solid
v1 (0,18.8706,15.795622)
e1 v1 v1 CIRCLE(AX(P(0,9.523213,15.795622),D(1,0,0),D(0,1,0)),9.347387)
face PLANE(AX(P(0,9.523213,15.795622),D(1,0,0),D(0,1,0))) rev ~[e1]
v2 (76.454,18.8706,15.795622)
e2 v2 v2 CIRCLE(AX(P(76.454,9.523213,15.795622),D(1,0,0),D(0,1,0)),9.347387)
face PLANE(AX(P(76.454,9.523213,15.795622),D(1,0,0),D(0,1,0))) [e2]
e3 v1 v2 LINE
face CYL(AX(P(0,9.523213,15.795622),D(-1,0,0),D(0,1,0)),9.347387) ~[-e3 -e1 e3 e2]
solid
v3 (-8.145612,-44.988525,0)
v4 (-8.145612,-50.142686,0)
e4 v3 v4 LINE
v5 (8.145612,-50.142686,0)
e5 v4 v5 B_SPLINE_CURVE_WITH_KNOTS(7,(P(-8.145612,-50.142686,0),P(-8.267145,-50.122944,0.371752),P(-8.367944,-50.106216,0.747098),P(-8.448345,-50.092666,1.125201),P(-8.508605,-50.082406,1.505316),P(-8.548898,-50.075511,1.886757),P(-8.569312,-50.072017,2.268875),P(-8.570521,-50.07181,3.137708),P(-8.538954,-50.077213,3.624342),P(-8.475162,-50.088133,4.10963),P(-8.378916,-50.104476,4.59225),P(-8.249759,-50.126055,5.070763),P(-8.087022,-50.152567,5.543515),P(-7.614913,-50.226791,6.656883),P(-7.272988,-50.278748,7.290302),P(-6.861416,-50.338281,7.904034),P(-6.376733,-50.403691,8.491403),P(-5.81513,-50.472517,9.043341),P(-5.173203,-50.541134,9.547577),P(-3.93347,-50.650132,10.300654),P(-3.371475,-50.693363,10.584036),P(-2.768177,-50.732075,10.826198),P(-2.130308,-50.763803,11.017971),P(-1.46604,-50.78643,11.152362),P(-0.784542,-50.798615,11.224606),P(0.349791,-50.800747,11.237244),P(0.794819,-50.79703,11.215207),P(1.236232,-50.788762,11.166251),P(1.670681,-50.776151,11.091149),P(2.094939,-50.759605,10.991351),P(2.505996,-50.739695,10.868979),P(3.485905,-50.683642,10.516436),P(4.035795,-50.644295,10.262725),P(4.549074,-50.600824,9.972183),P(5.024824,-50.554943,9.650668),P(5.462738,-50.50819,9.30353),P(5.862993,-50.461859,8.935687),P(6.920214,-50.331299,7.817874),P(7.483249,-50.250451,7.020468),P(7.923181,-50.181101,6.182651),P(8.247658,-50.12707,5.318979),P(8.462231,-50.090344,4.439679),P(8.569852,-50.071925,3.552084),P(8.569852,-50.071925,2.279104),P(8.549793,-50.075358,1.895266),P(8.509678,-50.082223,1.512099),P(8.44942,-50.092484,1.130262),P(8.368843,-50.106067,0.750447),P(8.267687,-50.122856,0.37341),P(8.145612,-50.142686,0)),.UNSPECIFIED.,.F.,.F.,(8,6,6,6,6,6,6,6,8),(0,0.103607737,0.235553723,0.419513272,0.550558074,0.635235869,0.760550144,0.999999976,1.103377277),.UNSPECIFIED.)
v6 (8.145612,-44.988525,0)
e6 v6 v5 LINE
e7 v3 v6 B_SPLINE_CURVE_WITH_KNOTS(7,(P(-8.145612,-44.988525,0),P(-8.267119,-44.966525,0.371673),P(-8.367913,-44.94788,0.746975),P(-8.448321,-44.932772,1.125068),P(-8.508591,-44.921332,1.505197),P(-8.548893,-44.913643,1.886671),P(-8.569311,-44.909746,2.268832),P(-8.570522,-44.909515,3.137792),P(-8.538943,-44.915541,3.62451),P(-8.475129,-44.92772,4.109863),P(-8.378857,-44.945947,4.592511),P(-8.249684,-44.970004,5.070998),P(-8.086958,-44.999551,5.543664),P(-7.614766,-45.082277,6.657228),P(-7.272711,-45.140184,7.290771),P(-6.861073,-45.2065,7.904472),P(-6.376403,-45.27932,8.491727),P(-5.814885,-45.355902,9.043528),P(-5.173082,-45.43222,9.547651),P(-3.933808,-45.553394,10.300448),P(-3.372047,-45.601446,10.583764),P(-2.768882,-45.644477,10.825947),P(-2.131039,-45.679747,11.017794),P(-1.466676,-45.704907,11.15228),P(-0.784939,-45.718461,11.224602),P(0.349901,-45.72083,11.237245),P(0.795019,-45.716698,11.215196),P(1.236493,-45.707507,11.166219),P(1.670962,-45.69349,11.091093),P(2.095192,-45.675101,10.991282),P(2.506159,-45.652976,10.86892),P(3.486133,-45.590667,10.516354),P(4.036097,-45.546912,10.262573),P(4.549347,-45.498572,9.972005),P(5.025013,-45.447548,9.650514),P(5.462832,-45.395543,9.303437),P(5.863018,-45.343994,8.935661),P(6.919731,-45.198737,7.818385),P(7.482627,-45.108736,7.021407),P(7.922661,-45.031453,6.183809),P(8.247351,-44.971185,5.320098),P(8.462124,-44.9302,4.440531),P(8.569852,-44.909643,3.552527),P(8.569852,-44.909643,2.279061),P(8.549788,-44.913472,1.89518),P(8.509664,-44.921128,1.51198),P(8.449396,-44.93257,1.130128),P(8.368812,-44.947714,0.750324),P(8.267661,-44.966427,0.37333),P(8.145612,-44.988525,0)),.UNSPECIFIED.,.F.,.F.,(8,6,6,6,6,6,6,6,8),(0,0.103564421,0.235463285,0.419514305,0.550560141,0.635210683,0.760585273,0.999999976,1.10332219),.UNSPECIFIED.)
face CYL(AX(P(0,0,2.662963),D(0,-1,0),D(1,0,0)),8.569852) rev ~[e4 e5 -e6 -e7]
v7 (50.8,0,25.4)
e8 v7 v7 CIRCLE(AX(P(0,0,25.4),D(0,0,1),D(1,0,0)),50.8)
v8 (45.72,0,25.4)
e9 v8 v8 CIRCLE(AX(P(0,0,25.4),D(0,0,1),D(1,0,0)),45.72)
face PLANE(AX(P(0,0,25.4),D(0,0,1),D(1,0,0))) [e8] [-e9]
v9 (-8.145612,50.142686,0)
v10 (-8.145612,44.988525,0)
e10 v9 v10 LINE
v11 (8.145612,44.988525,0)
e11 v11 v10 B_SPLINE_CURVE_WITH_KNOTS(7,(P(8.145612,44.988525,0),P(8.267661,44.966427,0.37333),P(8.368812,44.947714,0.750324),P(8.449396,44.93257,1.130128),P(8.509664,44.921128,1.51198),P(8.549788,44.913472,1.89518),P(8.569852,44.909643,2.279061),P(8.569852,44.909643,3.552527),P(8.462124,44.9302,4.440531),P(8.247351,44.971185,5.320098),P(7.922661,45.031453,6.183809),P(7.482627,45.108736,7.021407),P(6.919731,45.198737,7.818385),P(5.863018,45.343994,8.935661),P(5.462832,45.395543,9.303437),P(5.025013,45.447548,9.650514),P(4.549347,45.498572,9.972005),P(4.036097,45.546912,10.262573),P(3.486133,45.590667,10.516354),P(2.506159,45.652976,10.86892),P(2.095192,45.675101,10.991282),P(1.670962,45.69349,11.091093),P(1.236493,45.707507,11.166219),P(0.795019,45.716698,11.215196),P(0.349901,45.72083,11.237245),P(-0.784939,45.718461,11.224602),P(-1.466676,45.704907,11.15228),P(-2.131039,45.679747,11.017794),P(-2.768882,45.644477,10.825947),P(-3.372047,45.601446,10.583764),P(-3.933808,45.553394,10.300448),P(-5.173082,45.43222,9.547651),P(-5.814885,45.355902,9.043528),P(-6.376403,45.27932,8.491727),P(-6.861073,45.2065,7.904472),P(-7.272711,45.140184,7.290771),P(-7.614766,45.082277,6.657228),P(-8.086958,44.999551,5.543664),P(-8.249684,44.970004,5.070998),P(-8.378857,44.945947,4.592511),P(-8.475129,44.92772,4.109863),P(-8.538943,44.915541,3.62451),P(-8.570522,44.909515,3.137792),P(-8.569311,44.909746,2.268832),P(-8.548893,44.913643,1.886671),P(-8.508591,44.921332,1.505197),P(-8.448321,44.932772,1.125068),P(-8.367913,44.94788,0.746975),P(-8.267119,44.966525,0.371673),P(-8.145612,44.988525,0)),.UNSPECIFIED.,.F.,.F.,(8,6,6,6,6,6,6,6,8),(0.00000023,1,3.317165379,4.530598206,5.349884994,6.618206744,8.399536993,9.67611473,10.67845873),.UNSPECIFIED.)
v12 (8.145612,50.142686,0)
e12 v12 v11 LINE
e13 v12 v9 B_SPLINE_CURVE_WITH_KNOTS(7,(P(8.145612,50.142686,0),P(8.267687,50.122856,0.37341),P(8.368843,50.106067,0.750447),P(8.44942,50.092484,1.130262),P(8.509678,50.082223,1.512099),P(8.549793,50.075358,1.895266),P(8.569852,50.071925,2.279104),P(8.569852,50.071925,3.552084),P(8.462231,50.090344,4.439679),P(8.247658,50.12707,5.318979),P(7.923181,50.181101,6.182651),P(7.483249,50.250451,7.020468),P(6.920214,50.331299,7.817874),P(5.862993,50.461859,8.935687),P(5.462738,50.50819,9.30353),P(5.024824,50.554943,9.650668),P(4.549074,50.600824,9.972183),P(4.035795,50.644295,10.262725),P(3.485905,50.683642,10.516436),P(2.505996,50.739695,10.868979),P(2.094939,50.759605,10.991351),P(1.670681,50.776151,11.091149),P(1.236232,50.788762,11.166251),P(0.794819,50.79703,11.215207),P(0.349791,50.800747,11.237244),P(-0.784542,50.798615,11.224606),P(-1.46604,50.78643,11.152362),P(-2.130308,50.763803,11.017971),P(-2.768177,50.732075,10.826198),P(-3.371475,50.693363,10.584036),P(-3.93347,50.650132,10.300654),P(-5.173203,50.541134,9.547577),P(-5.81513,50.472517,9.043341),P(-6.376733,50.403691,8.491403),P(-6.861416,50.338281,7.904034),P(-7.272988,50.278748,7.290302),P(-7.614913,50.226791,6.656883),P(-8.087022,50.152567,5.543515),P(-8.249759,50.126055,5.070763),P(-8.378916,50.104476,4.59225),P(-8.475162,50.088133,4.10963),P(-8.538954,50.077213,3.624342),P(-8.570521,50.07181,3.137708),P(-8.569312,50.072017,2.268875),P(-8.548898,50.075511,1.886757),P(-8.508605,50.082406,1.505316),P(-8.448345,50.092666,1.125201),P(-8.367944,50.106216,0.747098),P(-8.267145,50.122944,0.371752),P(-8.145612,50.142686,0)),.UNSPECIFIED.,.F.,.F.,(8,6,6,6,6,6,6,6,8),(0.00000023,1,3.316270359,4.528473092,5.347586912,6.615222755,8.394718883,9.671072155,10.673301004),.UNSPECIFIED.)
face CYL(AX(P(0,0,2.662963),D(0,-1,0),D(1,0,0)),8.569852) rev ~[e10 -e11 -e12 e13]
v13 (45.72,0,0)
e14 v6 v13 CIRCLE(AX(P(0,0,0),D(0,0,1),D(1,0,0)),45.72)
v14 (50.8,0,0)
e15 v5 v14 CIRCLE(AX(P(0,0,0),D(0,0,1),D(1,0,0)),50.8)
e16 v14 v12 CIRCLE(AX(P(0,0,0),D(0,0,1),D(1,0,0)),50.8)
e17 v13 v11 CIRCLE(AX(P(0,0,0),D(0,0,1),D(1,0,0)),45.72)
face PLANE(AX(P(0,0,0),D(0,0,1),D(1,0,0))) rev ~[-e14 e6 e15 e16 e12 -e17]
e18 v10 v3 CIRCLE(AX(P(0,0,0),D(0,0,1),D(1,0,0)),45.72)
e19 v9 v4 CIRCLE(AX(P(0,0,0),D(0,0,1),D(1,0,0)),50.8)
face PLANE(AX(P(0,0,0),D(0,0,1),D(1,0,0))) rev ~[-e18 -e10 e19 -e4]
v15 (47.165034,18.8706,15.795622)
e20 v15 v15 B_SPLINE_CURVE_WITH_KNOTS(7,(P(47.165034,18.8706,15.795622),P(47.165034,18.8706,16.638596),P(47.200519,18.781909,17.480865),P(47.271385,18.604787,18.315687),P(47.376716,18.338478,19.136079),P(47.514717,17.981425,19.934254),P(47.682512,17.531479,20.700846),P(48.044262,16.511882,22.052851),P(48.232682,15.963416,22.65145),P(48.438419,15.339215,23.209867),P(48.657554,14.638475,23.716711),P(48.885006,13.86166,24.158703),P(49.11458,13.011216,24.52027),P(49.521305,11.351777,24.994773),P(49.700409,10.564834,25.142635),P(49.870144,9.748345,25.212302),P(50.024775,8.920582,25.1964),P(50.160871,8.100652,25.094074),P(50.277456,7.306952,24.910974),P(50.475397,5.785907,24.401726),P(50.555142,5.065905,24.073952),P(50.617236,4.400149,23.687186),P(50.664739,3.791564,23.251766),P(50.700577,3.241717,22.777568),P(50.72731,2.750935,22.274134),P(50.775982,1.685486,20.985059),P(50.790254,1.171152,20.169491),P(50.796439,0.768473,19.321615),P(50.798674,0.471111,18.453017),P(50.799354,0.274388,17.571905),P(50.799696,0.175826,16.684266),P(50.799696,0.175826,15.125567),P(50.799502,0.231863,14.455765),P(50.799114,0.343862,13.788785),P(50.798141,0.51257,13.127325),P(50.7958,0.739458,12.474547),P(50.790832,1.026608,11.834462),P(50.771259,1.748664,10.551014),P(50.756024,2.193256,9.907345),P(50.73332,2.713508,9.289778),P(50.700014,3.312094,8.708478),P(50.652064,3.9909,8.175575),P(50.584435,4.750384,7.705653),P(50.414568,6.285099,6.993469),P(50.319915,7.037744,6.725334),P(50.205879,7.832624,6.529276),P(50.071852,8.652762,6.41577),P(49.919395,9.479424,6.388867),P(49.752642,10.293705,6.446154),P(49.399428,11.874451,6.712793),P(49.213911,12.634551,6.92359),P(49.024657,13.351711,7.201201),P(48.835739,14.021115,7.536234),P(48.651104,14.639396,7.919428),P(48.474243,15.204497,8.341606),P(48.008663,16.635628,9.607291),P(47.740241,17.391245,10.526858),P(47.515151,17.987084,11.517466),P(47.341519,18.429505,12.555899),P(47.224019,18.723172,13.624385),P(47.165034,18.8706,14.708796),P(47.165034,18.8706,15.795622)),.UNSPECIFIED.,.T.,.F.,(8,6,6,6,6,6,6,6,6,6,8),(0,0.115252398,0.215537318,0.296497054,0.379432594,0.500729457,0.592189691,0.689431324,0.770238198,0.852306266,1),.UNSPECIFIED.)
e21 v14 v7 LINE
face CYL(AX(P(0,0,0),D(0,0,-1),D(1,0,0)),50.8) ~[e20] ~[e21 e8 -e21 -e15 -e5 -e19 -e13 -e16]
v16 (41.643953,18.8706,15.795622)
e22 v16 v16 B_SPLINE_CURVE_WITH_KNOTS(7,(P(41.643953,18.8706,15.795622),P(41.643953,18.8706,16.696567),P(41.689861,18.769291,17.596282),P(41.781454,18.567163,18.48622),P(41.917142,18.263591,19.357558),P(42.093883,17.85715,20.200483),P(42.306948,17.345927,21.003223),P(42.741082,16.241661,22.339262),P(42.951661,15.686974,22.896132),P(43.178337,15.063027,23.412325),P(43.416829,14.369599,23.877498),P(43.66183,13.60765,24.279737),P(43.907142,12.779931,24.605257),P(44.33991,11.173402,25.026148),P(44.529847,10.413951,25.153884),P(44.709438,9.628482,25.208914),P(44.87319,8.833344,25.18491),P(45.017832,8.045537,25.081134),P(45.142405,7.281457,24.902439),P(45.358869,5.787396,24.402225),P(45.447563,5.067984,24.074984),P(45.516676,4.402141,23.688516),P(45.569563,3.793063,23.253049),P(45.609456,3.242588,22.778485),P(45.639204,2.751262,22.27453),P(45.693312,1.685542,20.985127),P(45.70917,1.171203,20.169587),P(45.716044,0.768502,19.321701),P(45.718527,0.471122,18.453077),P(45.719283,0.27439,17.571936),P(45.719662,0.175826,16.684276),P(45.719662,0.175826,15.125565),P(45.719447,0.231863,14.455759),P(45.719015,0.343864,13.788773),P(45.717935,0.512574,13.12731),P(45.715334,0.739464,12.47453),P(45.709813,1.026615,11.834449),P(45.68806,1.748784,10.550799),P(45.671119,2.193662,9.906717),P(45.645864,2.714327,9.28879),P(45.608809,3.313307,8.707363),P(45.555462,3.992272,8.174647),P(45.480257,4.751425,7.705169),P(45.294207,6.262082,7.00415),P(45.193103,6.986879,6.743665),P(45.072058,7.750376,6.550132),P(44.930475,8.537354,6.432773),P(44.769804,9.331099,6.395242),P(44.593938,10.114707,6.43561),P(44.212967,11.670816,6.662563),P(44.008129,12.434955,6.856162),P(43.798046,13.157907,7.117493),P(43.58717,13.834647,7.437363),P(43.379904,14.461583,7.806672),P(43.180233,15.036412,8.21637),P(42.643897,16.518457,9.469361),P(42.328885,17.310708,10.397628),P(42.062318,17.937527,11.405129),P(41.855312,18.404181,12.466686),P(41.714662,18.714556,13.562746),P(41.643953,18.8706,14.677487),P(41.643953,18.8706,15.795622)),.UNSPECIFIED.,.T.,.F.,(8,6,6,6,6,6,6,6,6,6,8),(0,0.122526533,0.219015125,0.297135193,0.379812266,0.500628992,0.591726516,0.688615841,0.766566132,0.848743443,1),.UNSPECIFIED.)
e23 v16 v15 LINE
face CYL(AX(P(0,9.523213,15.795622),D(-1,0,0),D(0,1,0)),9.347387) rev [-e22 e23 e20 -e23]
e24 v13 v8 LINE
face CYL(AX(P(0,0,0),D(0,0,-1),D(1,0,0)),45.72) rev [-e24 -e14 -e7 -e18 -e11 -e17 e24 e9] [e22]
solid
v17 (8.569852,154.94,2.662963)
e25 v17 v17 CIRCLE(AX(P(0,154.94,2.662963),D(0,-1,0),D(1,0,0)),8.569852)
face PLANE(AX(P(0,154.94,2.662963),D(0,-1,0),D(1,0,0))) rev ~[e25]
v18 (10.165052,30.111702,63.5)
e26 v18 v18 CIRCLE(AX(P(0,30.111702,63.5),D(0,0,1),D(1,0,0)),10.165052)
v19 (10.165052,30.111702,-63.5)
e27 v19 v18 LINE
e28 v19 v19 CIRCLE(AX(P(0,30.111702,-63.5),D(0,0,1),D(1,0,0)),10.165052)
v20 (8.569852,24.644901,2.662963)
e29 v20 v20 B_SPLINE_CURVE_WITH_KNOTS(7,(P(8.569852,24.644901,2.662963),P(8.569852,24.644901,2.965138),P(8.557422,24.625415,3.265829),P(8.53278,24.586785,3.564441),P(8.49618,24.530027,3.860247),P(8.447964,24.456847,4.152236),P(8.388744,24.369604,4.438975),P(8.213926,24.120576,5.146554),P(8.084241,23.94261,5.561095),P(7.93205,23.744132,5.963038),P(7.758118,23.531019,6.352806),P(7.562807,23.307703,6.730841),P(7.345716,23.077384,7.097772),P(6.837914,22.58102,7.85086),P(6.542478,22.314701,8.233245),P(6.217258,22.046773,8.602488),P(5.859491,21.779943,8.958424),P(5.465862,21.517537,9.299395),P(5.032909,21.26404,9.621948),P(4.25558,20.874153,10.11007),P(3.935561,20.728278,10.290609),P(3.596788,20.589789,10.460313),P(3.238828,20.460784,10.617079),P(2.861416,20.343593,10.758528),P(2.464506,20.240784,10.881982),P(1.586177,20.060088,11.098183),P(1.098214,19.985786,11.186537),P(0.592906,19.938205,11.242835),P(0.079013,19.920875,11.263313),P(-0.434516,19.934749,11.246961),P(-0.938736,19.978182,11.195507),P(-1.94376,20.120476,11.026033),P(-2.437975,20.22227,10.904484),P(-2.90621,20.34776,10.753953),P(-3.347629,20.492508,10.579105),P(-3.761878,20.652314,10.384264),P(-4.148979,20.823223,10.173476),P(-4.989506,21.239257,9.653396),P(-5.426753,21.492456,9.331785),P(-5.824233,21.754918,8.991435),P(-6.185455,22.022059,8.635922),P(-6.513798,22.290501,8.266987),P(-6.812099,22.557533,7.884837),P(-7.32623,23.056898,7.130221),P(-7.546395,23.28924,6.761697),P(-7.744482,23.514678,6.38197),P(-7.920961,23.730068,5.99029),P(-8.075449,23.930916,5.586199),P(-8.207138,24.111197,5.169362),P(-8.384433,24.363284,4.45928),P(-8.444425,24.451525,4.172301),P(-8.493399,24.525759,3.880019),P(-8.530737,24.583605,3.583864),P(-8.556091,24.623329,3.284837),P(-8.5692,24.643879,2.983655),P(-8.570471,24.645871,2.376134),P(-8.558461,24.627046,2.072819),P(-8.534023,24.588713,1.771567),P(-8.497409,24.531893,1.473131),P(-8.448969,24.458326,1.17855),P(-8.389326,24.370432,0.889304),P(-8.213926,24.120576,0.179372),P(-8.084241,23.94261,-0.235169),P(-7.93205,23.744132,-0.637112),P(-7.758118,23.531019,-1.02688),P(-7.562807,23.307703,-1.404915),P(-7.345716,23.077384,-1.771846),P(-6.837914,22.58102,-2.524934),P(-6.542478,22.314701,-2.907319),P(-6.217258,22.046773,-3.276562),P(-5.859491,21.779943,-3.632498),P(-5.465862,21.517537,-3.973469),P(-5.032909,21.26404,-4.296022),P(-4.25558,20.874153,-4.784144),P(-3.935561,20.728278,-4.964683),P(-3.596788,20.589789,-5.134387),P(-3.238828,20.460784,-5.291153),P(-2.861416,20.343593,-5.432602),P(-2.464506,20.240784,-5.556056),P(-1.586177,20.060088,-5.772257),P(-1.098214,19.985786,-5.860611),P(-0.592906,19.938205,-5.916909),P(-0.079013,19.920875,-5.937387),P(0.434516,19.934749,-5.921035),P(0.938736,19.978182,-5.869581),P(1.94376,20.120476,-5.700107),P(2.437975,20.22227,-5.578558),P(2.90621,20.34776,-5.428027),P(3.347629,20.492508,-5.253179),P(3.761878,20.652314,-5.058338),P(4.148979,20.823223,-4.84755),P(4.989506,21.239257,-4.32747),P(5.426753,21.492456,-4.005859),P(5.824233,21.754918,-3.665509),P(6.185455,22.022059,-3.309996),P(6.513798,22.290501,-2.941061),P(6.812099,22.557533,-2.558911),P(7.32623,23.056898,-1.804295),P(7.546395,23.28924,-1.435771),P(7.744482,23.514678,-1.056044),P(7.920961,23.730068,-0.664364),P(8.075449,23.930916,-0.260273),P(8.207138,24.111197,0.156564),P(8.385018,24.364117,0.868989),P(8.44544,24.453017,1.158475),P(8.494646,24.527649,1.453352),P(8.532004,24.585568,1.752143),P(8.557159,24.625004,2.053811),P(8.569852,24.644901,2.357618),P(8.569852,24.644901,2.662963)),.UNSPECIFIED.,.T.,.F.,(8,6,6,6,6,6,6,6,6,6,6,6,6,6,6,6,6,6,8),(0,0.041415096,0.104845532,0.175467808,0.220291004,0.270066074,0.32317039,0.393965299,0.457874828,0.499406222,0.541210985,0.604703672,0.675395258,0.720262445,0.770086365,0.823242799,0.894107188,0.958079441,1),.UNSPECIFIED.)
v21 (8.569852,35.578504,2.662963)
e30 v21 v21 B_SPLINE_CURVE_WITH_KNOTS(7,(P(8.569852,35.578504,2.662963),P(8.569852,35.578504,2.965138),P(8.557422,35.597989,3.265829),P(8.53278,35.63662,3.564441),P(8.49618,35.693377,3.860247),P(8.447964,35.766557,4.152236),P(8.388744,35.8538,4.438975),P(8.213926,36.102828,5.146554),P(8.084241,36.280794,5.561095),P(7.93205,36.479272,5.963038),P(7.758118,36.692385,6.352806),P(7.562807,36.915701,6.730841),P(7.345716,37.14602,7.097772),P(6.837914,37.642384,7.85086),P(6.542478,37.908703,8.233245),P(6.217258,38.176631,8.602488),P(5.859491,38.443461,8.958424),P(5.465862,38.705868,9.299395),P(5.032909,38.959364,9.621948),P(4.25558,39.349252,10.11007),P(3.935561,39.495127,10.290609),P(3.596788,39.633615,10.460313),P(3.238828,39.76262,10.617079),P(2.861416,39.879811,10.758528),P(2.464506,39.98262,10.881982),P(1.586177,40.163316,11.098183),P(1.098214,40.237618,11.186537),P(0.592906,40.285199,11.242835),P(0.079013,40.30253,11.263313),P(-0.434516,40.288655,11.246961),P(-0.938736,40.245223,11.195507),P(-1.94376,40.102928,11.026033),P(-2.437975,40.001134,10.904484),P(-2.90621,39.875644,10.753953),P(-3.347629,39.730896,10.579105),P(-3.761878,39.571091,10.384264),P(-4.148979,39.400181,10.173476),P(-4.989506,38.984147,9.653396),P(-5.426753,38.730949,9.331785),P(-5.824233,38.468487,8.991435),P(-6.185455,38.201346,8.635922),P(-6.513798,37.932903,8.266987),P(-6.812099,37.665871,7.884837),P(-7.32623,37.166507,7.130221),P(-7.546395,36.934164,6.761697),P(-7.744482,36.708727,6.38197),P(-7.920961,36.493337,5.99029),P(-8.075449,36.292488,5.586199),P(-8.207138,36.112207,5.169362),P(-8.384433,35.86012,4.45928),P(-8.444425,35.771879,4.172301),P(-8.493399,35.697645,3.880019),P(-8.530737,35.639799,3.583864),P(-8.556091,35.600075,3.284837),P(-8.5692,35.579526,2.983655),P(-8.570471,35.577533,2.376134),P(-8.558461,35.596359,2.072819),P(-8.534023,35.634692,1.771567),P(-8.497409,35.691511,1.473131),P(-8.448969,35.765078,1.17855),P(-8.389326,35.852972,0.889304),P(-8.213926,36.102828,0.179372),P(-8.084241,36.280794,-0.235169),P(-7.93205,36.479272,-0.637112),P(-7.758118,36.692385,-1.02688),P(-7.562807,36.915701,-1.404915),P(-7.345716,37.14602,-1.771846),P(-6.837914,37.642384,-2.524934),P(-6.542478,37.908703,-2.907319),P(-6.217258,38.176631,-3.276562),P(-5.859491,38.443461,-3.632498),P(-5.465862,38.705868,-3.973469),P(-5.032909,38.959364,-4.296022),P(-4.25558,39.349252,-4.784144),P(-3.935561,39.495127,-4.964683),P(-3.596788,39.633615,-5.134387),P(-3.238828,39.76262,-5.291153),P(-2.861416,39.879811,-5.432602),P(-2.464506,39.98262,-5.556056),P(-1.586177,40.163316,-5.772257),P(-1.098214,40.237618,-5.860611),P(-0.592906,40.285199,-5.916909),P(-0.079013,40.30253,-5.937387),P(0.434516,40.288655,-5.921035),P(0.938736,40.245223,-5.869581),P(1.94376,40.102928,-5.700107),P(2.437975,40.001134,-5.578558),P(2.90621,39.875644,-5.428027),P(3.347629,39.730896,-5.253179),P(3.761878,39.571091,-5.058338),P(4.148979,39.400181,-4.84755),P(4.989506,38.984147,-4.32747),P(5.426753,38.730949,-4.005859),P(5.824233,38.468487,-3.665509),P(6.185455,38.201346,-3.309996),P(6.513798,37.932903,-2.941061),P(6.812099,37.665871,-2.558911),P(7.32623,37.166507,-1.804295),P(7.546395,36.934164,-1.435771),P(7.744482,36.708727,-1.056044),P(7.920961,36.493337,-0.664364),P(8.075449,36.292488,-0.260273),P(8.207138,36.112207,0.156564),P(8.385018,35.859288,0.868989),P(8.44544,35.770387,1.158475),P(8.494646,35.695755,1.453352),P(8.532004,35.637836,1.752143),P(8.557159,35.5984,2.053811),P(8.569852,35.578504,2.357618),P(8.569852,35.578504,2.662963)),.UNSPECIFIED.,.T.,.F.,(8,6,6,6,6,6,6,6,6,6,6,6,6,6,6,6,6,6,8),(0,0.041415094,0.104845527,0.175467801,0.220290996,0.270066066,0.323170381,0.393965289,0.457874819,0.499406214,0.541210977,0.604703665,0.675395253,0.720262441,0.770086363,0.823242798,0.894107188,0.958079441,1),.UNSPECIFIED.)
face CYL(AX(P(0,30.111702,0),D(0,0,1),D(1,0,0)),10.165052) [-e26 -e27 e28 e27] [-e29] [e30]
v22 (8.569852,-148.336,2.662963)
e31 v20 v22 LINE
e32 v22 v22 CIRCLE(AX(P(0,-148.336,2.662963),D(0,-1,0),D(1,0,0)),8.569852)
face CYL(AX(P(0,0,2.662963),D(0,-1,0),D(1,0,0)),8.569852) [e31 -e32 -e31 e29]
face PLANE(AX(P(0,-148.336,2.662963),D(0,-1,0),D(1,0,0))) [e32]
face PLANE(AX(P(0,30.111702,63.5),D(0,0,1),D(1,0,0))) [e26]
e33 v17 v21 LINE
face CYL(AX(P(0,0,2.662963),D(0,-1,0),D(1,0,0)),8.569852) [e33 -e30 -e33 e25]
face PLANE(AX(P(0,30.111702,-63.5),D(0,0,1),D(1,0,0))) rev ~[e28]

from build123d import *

# Parameters (mm, degrees)
F0_R     = 50.8
F1_DEPTH = 25.4
F2_T     = -5.08
F3_R     = 8.5698519832
F4_DEPTH = 148.336
F5_DEPTH = 154.94
F6_R     = 10.165051904
F7_DEPTH = 63.5
F8_R     = 9.3473873545
F9_DEPTH = 76.454


with BuildPart() as f1:
    # F0 (on Top) → F1 (new body)
    with BuildSketch(Plane.XY):
        Circle(F0_R)
    extrude(amount=F1_DEPTH)

    # F2
    f2_openings = [f1.faces().sort_by_distance(p)[0] for p in [
        (0, 0, 25.4),
        (0, 0, 0),
    ]]
    offset(amount=F2_T, openings=f2_openings)


with BuildPart() as f4:
    # F3 (on Front) → F4 (new body)
    with BuildSketch(Plane.XZ):
        with Locations((0, 2.6629630011)):
            Circle(F3_R)
    extrude(amount=F4_DEPTH)

    # F3 (on Front) → F5 (join)
    with BuildSketch(Plane.XZ):
        with Locations((0, 2.6629630011)):
            Circle(F3_R)
    extrude(amount=-F5_DEPTH)

    # F6 (on Top) → F7 (join, symmetric)
    with BuildSketch(Plane.XY):
        with Locations((0, 30.111702159)):
            Circle(F6_R)
    extrude(amount=F7_DEPTH, both=True)


with BuildPart() as f9:
    # F8 (on Right) → F9 (new body)
    with BuildSketch(Plane.YZ):
        with Locations((9.5232129097, 15.795622021)):
            Circle(F8_R)
    extrude(amount=F9_DEPTH)


with BuildPart() as f1_1:
    add(f1.part)

    # F10: cut F4
    add(f4.part, mode=Mode.SUBTRACT)

    # F11: cut F9
    add(f9.part, mode=Mode.SUBTRACT)


solid = Compound([f4.part, f9.part, f1_1.part])
